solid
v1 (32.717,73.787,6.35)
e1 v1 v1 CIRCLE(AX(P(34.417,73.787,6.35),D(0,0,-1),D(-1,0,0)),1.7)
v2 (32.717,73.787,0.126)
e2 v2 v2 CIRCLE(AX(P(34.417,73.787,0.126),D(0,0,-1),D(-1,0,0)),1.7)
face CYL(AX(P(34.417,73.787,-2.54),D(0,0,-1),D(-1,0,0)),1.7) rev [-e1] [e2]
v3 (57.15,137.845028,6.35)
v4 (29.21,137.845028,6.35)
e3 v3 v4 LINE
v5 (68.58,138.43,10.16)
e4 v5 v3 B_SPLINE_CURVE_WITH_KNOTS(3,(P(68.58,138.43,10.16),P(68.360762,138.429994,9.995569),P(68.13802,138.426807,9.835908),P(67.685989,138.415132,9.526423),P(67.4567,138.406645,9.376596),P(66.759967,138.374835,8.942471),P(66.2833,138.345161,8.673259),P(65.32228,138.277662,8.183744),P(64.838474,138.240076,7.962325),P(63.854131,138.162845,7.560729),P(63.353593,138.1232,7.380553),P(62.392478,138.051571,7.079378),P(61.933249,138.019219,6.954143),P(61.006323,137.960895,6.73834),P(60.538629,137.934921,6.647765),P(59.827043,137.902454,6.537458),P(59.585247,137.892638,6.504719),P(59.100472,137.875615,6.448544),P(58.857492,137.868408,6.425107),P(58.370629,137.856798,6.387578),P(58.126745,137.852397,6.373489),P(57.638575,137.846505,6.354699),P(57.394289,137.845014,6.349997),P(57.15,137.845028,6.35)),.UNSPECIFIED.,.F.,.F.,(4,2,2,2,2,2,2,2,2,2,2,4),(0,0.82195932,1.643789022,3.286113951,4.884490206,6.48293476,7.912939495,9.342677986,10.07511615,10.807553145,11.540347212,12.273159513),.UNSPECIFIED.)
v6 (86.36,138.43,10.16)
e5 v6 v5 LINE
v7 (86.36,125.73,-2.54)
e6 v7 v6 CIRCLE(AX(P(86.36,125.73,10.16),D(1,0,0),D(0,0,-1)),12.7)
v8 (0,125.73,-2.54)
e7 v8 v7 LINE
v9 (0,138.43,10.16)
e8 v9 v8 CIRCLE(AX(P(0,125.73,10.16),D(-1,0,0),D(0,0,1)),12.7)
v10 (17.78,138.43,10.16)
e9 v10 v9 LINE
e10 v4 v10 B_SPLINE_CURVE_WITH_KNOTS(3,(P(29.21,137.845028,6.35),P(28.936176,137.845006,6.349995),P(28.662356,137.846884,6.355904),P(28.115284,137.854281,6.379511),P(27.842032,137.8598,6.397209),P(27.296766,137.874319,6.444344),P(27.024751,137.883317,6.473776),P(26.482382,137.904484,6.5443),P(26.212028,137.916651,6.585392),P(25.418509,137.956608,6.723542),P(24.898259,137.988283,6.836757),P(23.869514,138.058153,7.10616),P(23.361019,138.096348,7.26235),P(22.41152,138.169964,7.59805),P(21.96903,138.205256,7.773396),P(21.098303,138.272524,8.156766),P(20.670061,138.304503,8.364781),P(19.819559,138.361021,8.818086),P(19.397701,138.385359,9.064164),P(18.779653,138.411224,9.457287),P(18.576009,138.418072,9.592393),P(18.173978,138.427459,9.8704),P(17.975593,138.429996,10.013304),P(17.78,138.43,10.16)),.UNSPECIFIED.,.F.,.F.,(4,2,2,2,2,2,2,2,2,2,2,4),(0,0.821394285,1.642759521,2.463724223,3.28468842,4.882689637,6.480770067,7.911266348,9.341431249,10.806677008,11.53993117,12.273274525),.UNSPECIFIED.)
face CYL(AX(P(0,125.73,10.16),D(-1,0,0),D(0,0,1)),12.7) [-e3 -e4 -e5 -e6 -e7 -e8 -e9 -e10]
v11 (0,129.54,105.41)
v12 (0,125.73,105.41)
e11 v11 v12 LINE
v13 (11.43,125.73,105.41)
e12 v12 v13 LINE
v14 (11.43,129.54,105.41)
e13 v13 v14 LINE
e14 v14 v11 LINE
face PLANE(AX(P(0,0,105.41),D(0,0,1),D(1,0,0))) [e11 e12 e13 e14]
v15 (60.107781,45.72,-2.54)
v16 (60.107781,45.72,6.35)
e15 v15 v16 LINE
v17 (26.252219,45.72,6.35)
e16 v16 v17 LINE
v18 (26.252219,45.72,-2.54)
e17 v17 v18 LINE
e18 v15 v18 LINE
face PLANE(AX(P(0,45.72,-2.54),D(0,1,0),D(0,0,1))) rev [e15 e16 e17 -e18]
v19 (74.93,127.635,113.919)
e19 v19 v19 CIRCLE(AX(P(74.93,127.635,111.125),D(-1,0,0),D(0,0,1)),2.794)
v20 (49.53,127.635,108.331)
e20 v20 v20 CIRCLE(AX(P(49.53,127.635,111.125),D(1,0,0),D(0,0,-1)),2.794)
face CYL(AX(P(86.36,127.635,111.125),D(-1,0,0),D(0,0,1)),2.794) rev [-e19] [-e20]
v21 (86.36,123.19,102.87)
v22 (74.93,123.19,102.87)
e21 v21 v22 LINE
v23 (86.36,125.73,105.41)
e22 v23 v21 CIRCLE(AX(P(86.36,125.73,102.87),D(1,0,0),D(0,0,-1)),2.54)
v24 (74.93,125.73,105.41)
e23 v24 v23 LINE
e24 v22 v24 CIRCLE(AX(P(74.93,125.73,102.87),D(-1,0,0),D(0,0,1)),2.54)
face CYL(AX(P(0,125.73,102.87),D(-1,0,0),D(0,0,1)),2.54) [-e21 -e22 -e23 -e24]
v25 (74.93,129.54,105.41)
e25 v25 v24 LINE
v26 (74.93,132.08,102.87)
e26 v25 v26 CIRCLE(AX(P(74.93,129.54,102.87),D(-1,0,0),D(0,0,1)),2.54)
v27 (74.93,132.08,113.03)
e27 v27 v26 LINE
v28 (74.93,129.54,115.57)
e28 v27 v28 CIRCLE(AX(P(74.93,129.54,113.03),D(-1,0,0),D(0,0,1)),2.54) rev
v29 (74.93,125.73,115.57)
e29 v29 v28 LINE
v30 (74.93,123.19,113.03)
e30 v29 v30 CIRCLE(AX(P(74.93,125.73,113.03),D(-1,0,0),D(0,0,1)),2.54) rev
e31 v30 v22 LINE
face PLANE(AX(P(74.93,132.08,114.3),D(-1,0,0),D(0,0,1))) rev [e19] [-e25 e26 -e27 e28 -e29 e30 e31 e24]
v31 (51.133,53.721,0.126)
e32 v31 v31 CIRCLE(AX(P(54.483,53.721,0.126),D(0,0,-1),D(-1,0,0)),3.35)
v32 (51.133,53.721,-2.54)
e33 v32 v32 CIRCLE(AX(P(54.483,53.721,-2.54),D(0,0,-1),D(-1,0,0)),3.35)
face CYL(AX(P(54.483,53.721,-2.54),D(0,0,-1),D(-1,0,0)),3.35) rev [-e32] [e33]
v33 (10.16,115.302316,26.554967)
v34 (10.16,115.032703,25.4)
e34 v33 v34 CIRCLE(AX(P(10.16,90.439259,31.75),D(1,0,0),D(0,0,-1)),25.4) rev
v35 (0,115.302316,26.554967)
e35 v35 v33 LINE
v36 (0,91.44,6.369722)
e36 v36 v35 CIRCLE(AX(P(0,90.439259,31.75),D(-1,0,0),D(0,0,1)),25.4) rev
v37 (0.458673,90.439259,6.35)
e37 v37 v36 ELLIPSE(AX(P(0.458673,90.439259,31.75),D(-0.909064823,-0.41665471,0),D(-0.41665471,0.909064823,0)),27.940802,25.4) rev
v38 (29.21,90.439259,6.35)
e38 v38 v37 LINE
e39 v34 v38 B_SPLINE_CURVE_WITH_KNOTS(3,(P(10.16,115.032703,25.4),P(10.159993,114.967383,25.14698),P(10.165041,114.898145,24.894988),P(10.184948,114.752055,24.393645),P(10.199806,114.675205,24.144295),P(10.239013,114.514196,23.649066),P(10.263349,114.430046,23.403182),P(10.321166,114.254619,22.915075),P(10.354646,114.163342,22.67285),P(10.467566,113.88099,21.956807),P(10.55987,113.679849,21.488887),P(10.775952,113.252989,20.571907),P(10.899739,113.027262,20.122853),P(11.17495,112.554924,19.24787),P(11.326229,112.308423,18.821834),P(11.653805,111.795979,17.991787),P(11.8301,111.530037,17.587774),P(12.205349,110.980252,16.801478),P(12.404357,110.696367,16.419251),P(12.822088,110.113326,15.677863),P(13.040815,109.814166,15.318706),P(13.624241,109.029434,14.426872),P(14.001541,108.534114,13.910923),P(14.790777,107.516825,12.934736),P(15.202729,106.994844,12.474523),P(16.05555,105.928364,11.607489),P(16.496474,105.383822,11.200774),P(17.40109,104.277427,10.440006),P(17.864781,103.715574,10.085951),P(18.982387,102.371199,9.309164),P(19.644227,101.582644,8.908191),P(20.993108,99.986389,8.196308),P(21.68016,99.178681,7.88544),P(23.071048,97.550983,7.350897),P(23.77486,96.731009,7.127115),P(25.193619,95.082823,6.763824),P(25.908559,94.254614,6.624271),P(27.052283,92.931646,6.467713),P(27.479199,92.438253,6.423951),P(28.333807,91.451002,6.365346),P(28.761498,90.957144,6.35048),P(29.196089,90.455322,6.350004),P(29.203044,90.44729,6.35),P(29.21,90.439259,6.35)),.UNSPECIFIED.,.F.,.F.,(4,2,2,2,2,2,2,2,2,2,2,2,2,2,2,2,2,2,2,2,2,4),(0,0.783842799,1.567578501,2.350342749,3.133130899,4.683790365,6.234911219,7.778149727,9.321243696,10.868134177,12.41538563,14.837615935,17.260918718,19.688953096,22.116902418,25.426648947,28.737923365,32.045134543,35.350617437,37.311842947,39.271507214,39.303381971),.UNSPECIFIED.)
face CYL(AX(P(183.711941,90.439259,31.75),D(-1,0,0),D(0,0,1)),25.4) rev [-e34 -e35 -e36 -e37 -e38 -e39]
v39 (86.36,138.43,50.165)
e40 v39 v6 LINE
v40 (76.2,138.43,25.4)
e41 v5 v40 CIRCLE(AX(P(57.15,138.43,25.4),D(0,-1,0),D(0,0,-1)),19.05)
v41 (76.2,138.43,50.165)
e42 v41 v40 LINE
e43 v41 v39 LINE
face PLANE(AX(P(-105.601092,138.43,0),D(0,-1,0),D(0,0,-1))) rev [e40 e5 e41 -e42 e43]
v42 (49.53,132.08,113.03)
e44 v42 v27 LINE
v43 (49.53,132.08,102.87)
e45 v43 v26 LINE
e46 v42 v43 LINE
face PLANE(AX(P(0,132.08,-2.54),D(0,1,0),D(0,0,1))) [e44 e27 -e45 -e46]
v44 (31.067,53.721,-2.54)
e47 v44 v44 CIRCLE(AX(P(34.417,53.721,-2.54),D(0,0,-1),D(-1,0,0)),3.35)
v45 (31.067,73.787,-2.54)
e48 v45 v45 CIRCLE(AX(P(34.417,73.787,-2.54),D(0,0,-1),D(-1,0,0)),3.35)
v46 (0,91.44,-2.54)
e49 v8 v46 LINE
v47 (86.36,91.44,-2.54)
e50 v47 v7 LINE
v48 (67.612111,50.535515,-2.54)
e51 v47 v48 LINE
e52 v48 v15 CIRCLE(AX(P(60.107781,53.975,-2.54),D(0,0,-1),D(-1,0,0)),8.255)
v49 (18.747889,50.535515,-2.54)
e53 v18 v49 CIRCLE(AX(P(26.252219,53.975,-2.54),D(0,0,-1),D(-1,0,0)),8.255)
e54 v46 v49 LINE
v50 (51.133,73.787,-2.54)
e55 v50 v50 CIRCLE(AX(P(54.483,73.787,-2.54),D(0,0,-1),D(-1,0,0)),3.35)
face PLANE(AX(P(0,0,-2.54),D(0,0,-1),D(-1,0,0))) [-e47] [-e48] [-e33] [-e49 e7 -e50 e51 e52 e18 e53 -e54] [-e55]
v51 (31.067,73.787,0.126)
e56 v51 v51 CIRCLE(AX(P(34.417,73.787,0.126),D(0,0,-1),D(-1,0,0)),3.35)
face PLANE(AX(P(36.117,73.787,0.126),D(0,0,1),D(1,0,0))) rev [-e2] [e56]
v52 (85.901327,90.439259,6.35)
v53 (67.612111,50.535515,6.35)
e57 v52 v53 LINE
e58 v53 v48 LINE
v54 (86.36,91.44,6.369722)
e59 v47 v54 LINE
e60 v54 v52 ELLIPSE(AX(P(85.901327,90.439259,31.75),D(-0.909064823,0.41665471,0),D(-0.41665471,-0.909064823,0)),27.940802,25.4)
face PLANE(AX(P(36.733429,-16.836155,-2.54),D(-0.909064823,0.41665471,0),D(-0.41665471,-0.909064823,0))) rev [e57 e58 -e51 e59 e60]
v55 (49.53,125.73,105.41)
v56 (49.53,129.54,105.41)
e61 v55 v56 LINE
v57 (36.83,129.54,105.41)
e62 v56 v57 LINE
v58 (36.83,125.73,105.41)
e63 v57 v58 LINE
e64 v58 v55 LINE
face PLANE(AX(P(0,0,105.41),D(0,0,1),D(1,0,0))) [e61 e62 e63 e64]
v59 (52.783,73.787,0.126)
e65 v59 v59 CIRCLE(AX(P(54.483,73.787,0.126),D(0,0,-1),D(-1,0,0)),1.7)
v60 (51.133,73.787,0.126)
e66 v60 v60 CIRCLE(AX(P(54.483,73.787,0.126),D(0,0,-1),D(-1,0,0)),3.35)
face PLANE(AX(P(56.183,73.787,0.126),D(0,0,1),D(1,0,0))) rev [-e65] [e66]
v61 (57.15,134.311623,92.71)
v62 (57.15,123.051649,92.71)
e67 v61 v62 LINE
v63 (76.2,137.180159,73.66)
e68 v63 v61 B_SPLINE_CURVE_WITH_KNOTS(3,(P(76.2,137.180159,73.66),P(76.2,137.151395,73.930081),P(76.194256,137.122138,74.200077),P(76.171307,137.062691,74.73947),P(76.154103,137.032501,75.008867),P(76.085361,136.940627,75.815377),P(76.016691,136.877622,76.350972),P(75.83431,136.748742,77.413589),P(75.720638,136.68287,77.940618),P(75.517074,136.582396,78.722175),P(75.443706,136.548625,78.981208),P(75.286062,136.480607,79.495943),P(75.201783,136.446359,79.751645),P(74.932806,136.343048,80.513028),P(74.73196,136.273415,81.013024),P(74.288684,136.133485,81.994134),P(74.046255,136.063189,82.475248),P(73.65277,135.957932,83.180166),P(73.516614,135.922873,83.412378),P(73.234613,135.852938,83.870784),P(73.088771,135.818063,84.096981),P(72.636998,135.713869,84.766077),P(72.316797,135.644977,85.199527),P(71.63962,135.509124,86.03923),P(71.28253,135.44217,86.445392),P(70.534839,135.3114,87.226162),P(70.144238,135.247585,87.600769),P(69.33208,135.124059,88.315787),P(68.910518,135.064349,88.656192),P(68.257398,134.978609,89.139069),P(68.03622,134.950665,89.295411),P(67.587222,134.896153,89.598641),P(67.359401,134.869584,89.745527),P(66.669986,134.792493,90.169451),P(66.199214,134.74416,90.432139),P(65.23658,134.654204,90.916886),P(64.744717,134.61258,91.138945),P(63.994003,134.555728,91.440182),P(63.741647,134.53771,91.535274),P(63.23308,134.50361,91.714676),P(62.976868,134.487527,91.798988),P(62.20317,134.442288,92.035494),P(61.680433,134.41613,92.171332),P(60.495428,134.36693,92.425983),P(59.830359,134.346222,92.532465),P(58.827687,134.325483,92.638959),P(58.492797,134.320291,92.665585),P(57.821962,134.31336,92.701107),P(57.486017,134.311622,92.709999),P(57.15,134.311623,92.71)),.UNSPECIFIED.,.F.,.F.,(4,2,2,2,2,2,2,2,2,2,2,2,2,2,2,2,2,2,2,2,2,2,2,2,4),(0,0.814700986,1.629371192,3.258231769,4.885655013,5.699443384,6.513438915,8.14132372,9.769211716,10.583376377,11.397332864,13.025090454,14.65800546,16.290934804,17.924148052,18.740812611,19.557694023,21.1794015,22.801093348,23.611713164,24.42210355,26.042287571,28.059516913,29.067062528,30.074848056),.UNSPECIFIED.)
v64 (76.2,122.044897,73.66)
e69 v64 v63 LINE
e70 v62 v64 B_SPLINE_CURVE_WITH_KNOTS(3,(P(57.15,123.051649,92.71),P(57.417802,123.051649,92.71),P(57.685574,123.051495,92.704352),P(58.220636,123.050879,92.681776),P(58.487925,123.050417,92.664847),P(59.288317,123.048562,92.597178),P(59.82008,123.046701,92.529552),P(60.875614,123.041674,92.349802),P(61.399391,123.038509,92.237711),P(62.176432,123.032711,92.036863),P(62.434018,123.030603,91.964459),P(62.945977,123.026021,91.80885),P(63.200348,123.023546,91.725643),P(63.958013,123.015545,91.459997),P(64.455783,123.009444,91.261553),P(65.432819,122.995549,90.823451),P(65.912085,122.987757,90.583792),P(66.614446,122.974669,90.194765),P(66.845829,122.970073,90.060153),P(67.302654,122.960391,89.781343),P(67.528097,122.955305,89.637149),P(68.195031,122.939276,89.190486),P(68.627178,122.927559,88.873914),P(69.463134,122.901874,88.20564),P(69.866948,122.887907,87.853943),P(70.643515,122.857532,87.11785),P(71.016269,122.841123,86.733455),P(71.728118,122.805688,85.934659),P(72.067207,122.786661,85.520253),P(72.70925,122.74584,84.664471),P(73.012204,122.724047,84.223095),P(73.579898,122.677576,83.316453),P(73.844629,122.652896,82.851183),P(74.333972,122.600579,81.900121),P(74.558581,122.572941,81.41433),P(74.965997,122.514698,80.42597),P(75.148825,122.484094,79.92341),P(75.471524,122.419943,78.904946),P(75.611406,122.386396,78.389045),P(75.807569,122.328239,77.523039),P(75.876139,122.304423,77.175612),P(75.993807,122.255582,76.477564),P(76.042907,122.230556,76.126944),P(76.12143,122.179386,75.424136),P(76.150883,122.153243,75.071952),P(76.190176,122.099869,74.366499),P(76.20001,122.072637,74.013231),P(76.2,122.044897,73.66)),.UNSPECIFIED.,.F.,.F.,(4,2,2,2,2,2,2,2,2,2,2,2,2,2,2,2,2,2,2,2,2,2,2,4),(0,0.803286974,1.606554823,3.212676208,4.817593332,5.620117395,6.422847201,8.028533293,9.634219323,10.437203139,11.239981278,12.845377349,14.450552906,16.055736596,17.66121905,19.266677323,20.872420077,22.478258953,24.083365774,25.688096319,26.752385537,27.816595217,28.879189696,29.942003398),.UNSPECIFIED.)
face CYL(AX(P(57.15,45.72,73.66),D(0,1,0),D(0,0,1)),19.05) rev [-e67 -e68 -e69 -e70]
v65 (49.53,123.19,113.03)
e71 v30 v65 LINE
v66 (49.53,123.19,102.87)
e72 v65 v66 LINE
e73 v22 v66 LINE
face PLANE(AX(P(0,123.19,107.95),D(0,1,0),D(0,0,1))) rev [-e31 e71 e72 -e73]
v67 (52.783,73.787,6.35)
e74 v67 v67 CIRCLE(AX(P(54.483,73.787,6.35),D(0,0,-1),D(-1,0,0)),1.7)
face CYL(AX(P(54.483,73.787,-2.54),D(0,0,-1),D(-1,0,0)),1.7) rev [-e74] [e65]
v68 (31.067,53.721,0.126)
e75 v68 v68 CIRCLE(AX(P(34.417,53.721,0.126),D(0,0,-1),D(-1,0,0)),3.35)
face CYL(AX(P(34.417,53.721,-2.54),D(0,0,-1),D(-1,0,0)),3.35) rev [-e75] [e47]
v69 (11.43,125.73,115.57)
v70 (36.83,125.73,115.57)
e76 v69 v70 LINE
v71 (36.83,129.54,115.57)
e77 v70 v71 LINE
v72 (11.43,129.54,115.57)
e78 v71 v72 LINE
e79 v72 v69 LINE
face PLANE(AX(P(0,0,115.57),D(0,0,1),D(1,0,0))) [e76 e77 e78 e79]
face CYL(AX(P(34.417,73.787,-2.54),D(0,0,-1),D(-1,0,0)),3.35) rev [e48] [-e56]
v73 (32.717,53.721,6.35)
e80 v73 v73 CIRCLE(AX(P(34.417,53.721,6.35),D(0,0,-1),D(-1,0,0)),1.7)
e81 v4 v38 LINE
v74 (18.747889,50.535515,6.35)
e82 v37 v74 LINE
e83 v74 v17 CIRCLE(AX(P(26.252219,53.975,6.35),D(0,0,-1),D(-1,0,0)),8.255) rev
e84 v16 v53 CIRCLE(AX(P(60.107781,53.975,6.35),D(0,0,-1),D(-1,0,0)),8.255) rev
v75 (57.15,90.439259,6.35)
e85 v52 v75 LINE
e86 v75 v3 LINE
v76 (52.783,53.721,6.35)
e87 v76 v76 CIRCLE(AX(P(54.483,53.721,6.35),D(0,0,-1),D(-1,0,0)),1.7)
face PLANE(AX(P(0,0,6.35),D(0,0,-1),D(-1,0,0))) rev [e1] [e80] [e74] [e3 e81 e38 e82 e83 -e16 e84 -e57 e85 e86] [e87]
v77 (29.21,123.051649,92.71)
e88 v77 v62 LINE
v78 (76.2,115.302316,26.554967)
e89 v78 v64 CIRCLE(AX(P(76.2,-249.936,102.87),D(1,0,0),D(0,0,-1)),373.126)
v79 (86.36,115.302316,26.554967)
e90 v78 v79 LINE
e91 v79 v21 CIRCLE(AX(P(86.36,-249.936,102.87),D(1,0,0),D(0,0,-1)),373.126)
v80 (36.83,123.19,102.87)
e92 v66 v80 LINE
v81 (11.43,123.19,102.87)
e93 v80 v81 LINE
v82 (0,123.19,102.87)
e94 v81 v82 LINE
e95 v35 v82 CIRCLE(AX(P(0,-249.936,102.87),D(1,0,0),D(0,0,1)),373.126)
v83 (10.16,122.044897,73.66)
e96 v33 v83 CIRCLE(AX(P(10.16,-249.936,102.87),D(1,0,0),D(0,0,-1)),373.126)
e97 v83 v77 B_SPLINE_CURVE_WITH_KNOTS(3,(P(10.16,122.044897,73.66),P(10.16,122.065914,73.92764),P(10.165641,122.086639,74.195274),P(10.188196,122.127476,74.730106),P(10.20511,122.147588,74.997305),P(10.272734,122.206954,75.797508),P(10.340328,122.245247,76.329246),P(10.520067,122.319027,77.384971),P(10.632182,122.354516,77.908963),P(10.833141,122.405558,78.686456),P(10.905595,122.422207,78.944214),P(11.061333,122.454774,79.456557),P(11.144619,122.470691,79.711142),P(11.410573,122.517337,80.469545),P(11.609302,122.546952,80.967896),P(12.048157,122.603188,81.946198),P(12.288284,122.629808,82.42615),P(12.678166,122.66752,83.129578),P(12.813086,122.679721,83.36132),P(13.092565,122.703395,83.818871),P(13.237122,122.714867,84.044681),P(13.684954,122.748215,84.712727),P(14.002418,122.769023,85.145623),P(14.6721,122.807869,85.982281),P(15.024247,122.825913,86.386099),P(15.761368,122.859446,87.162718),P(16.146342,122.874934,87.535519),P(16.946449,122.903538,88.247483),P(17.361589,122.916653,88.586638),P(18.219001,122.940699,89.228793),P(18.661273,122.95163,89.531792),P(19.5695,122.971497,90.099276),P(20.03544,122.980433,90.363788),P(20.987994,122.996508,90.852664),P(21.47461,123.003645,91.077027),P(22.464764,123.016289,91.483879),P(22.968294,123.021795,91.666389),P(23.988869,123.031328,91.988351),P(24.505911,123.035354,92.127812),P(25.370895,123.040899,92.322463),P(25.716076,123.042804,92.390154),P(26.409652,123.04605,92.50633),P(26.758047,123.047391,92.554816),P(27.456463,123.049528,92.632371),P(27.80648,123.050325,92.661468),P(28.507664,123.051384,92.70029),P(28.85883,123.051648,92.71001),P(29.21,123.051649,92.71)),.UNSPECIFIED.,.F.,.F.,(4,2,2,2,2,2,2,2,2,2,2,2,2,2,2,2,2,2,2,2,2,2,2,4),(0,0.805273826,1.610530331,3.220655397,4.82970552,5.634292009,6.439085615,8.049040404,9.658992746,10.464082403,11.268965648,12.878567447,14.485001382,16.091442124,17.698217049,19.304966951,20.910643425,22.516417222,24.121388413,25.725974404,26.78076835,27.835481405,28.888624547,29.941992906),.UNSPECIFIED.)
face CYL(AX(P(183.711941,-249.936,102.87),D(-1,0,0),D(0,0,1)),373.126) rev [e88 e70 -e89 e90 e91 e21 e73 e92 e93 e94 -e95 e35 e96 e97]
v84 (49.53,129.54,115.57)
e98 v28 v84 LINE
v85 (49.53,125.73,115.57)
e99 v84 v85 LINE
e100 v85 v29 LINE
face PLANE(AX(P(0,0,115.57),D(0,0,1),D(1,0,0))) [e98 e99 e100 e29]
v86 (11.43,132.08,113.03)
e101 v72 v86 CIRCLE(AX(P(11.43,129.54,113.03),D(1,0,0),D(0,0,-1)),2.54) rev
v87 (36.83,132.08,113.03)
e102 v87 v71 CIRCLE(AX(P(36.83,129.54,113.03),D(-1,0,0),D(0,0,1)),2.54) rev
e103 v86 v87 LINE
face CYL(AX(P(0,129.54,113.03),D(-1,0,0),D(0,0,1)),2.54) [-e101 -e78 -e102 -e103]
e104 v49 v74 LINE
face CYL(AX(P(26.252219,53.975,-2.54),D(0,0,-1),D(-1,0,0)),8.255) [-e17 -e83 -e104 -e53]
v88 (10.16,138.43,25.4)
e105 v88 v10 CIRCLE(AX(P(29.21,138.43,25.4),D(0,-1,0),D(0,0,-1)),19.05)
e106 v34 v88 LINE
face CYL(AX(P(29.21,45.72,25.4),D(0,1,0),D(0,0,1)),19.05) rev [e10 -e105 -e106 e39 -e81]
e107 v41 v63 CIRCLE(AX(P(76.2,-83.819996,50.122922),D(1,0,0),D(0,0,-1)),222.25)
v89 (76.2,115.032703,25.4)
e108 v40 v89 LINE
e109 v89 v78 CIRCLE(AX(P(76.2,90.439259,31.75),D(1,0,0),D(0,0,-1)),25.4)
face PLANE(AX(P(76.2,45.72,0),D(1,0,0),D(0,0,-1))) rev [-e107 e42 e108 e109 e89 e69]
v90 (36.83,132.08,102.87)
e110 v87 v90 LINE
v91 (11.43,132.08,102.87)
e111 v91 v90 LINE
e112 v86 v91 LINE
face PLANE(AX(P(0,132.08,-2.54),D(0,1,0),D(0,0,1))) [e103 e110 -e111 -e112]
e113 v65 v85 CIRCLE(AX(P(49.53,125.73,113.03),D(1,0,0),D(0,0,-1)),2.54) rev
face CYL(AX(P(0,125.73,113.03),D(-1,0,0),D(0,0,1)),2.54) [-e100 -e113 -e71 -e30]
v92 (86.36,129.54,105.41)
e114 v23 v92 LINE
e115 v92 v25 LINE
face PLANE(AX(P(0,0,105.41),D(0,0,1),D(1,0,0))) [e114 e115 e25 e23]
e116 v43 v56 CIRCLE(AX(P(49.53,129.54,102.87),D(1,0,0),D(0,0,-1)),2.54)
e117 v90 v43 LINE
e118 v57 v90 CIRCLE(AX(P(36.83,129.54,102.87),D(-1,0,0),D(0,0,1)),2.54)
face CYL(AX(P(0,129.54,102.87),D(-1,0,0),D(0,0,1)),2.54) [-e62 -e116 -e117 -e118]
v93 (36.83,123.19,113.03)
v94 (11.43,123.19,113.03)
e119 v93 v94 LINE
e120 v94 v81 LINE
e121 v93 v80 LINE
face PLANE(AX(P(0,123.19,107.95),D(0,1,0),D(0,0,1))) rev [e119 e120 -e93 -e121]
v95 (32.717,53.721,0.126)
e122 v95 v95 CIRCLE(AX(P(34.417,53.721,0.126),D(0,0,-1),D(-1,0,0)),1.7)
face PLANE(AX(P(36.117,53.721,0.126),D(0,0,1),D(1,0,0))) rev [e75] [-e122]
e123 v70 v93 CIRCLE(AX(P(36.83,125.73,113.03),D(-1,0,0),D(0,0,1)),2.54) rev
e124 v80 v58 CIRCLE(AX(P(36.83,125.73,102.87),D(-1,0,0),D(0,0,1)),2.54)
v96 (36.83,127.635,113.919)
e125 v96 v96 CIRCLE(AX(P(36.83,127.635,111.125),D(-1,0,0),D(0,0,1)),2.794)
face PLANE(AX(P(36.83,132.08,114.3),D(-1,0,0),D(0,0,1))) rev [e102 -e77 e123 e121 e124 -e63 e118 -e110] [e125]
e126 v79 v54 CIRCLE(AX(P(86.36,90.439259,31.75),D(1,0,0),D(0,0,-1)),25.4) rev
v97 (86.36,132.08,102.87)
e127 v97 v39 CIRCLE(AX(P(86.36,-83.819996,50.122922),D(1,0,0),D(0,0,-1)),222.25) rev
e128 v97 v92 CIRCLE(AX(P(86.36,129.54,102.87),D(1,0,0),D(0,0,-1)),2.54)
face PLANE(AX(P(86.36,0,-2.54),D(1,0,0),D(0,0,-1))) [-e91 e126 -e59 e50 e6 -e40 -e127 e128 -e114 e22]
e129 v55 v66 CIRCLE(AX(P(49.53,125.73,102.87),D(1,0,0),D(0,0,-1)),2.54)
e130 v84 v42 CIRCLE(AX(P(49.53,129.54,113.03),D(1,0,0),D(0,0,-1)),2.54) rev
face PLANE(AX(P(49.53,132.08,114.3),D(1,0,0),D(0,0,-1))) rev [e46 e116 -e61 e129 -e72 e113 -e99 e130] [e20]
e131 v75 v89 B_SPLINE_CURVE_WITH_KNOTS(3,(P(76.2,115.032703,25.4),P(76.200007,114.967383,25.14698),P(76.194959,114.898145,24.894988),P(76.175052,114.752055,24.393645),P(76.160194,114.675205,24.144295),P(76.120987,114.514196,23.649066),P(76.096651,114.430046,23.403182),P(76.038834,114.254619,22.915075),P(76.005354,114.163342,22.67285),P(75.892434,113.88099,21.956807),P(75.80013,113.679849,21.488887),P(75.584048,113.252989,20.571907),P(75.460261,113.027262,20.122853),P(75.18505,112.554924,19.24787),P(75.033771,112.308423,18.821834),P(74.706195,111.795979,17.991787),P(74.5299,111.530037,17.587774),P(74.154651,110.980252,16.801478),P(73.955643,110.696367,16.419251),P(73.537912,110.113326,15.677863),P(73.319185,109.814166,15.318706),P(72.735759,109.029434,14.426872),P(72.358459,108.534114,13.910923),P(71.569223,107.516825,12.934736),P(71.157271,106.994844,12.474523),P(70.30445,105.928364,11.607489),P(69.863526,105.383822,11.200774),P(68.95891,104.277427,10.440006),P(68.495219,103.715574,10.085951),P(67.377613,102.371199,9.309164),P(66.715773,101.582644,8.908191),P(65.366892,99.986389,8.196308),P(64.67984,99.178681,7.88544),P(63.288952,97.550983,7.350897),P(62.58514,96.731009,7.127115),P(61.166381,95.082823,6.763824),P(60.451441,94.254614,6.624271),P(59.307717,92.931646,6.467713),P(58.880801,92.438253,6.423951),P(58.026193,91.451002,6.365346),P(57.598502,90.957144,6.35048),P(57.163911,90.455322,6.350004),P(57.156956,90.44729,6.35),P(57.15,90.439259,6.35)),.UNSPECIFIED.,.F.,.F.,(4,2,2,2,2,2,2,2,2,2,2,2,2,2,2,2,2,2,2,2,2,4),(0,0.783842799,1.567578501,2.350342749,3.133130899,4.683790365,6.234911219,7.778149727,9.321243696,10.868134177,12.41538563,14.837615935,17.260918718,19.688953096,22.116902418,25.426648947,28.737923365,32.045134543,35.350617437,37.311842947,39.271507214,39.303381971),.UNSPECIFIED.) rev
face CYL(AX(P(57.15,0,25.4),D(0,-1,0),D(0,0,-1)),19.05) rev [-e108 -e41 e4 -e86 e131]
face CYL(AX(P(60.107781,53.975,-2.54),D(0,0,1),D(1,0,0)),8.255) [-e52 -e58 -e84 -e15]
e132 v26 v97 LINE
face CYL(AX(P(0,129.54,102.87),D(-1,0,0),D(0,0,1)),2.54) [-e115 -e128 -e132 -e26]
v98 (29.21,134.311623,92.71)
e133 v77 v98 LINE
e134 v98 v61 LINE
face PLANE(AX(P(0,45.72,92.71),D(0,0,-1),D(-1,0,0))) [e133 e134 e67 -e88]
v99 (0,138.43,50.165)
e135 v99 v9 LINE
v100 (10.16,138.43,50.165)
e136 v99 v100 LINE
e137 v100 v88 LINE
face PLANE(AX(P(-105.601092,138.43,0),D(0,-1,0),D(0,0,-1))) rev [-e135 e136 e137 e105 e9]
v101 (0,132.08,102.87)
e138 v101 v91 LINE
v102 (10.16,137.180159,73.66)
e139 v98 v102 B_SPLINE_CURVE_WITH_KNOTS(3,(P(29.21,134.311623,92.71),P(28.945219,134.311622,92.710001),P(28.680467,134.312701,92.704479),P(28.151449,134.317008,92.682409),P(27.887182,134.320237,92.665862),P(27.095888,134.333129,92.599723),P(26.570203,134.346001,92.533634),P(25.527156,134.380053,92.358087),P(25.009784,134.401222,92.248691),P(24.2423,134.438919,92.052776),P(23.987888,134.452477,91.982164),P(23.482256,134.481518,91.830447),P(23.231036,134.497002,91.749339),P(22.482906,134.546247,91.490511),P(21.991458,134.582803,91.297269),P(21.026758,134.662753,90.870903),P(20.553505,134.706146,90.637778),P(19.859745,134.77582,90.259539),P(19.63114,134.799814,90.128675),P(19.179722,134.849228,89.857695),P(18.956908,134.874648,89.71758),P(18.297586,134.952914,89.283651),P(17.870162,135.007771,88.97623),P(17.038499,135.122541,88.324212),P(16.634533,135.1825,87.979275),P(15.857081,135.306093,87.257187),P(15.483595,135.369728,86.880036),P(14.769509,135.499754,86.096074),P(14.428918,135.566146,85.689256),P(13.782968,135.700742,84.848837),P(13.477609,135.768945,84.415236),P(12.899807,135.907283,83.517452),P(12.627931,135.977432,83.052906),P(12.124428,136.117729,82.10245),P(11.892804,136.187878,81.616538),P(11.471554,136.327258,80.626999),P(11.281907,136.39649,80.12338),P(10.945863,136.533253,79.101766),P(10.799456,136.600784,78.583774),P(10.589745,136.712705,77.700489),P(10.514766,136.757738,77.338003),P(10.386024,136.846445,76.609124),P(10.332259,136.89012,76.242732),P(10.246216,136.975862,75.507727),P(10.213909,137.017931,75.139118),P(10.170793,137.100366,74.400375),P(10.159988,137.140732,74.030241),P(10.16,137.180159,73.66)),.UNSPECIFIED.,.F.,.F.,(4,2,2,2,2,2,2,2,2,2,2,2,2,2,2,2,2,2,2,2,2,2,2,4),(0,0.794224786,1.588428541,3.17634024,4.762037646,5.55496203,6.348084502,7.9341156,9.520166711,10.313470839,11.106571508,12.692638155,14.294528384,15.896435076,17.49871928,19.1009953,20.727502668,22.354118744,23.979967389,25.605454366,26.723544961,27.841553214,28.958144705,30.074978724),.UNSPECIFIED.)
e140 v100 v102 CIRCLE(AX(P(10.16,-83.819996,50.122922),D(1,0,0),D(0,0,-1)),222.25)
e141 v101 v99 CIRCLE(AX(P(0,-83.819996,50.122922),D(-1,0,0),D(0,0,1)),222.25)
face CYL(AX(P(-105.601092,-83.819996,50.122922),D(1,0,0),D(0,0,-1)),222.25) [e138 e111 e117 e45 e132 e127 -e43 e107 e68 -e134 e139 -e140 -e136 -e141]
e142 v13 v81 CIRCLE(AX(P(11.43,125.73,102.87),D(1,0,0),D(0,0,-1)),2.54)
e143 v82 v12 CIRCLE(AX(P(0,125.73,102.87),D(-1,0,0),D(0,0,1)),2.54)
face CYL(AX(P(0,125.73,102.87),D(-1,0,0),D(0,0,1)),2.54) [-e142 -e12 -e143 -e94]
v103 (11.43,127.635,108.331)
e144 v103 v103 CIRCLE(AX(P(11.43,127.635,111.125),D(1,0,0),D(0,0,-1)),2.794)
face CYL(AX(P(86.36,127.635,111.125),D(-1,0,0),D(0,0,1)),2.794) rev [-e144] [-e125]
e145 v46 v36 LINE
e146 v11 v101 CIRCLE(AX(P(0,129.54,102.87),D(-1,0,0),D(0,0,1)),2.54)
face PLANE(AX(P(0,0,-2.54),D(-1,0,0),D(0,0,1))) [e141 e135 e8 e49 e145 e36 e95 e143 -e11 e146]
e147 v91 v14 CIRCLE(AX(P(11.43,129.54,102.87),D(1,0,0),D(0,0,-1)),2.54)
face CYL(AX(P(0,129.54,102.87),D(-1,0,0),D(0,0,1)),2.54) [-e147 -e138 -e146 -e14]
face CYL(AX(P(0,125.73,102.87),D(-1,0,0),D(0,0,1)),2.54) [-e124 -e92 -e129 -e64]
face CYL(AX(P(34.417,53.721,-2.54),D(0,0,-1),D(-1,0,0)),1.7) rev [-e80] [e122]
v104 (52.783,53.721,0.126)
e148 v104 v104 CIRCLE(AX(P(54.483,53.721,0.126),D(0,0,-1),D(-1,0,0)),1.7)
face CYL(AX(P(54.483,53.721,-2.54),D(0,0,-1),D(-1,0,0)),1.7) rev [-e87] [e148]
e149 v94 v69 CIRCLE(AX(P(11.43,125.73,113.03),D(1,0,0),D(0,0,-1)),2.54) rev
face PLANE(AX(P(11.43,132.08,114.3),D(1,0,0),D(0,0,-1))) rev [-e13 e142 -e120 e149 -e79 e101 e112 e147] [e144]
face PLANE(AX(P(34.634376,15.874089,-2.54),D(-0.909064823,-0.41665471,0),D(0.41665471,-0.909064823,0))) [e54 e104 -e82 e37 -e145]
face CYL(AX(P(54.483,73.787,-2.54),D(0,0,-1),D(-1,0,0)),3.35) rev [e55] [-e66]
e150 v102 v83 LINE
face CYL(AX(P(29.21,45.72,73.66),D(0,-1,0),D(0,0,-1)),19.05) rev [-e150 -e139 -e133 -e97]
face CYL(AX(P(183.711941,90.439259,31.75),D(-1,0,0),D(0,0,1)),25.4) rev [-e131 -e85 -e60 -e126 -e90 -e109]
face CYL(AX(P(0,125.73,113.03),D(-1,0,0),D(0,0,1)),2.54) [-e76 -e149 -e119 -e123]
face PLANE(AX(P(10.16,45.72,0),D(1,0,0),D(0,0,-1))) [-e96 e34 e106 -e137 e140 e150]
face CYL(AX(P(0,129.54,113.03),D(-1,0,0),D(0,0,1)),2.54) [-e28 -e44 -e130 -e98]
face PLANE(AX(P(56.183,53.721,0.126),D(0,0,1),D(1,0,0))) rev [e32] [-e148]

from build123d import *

# Parameters (mm, degrees)
BOSS_EXTRUDE2_DEPTH             = 6.35
BOSS_EXTRUDE2_DEPTH_BACK        = 2.54
SKETCH2_W                       = 86.35999999999999
SKETCH2_H                       = 132.07999999999998
SKETCH3_W                       = 86.35999999999999
SKETCH3_H                       = 8.889999999999999
BOSS_EXTRUDE3_DEPTH             = 101.6
SKETCH6_W                       = 25.39999999999999
SKETCH6_H                       = 8.89
BOSS_EXTRUDE4_DEPTH             = 6.35
CBORE_FOR_M3_SBHCS1_D           = 3.4
CBORE_FOR_M3_SBHCS1_CBORE_D     = 6.7
CBORE_FOR_M3_SBHCS1_CBORE_DEPTH = 2.666
CUT_EXTRUDE3_DEPTH              = 182.55670546691465
CUT_EXTRUDE3_DEPTH_BACK         = 182.55670546691465
SKETCH7_R                       = 2.7940000000000107
FILLET1_R                       = 2.5399999999999996
SKETCH11_W                      = 86.35999999999999
SKETCH11_H                      = 8.889999999999999
CUT_EXTRUDE4_DEPTH              = 22.86
SKETCH12_W                      = 11.429999999999993
SKETCH12_H                      = 8.89
SKETCH12_W_2                    = 11.429999999999998
CUT_EXTRUDE5_DEPTH              = 2.5399999999999996
MOVE_START                      = 11.43
MOVE_FACE1_DEPTH                = 25.4
MOVE_START_2                    = 49.53
MOVE_FACE1_2_DEPTH              = 25.4
SKETCH13_W                      = 86.35999999999999
SKETCH13_H                      = 78.74000000000001
CUT_EXTRUDE6_DEPTH              = 190.71096594556678
CUT_EXTRUDE7_DEPTH              = 192.9171289906141
FILLET8_R                       = 2.54
BOSS_EXTRUDE6_START             = -86.36
BOSS_EXTRUDE6_DEPTH             = 86.36
BOSS_EXTRUDE8_START             = -86.36
BOSS_EXTRUDE8_DEPTH             = 86.36
CUT_EXTRUDE8_DEPTH              = 169.1443549453861
CUT_EXTRUDE8_DEPTH_BACK         = 169.1443549453861
FILLET12_R                      = 19.05
FILLET13_R                      = 25.4
FILLET14_R                      = 8.255
FILLET16_R                      = 12.7


# Read off the part's stored shape, not the designer's step: Move Face1
with BuildPart() as part:
    # Sketch2 → Boss-Extrude2 (new, two sides: drawn at the far end of the back side and taken through both)
    with BuildSketch(Plane.XY.offset(-BOSS_EXTRUDE2_DEPTH_BACK)):
        with Locations((43.17999999999999, 66.03999999999999)):
            Rectangle(SKETCH2_W, SKETCH2_H)
    extrude(amount=BOSS_EXTRUDE2_DEPTH + BOSS_EXTRUDE2_DEPTH_BACK)

    # Sketch3 → Boss-Extrude3 (add)
    with BuildSketch(Plane.XY.offset(6.35)):
        Polygon((0, 132.07999999999998), (86.35999999999999, 132.07999999999998), (86.35999999999999, 123.18999999999998), (-3.27e-15, 123.18999999999998), align=None)
        with Locations((43.17999999999999, 4.444999999999999)):
            Rectangle(SKETCH3_W, SKETCH3_H)
    extrude(amount=BOSS_EXTRUDE3_DEPTH)

    # Sketch6 → Boss-Extrude4 (add)
    with BuildSketch(Plane.XY.offset(107.94999999999999)):
        with Locations((62.23, 127.63499999999999)):
            Rectangle(SKETCH6_W, SKETCH6_H)
        with Locations((24.129999999999995, 127.63499999999999)):
            Rectangle(SKETCH6_W, SKETCH6_H)
    extrude(amount=BOSS_EXTRUDE4_DEPTH)

    # CBORE for M3 SBHCS1 (through all)
    with Locations(Plane(origin=(0, 0, -2.54), x_dir=(1, 0, 0), z_dir=(0, 0, -1))):
        with Locations((34.417, -53.721), (54.483, -53.721), (34.417, -73.787), (54.483, -73.787)):
            CounterBoreHole(CBORE_FOR_M3_SBHCS1_D / 2, CBORE_FOR_M3_SBHCS1_CBORE_D / 2, CBORE_FOR_M3_SBHCS1_CBORE_DEPTH)

    # Sketch7 → Cut-Extrude3 (cut, two sides: drawn at the far end of the back side and taken through both)
    with BuildSketch(Plane.ZY.offset(-49.53).offset(-CUT_EXTRUDE3_DEPTH_BACK)):
        with Locations((111.12499999999999, 127.635)):
            Circle(SKETCH7_R)
    extrude(amount=CUT_EXTRUDE3_DEPTH + CUT_EXTRUDE3_DEPTH_BACK, mode=Mode.SUBTRACT)

    # Fillet1
    fillet1_edges = [part.edges().sort_by_distance(p)[0] for p in [
        (62.23, 123.18999999999998, 114.29999999999998),
        (62.23, 132.07999999999998, 114.29999999999998),
        (24.129999999999995, 123.18999999999998, 114.29999999999998),
        (24.129999999999995, 132.07999999999998, 114.29999999999998),
    ]]
    fillet(fillet1_edges, radius=FILLET1_R)

    # Sketch11 → Cut-Extrude4 (cut)
    with BuildSketch(Plane.XY.offset(107.94999999999999)):
        with Locations((43.17999999999999, 4.444999999999999)):
            Rectangle(SKETCH11_W, SKETCH11_H)
    extrude(amount=-CUT_EXTRUDE4_DEPTH, mode=Mode.SUBTRACT)

    # Sketch12 → Cut-Extrude5 (cut)
    with BuildSketch(Plane.XY.offset(107.94999999999999)):
        with Locations((80.64499999999998, 127.63499999999999)):
            Rectangle(SKETCH12_W, SKETCH12_H)
        Polygon((49.53, 123.18999999999998), (36.82999999999999, 123.18999999999997), (36.82999999999999, 132.07999999999998), (49.53, 132.07999999999998), align=None)
        with Locations((5.714999999999999, 127.63499999999999)):
            Rectangle(SKETCH12_W_2, SKETCH12_H)
    extrude(amount=-CUT_EXTRUDE5_DEPTH, mode=Mode.SUBTRACT)

    # Move Face1 outline → Move Face1 (add)
    with BuildSketch(Plane.YZ.offset(MOVE_START)):
        with BuildLine():
            ThreePointArc((132.08, 113.03), (131.336051224, 114.826051224), (129.54, 115.57))
            Line((129.54, 115.57), (125.73, 115.57))
            ThreePointArc((125.73, 115.57), (123.933948776, 114.826051224), (123.19, 113.03))
            Line((123.19, 113.03), (123.19, 111.76))
            ThreePointArc((123.19, 111.76), (123.933948776, 113.556051224), (125.73, 114.3))
            Line((125.73, 114.3), (129.54, 114.3))
            ThreePointArc((129.54, 114.3), (131.336051224, 113.556051224), (132.08, 111.76))
            Line((132.08, 111.76), (132.08, 113.03))
        make_face()
    extrude(amount=MOVE_FACE1_DEPTH)

    # Move Face1 2 outline → Move Face1 2 (add)
    with BuildSketch(Plane.YZ.offset(MOVE_START_2)):
        with BuildLine():
            ThreePointArc((132.08, 113.03), (131.336051224, 114.826051224), (129.54, 115.57))
            Line((129.54, 115.57), (125.73, 115.57))
            ThreePointArc((125.73, 115.57), (123.933948776, 114.826051224), (123.19, 113.03))
            Line((123.19, 113.03), (123.19, 111.76))
            ThreePointArc((123.19, 111.76), (123.933948776, 113.556051224), (125.73, 114.3))
            Line((125.73, 114.3), (129.54, 114.3))
            ThreePointArc((129.54, 114.3), (131.336051224, 113.556051224), (132.08, 111.76))
            Line((132.08, 111.76), (132.08, 113.03))
        make_face()
    extrude(amount=MOVE_FACE1_2_DEPTH)

    # Sketch13 → Cut-Extrude6 (cut, through all)
    with BuildSketch(Plane(origin=(0, 8.889999999999999, 0), x_dir=(1, 0, 0), z_dir=(0, 1, 0))):
        with Locations((43.17999999999999, -45.72)):
            Rectangle(SKETCH13_W, SKETCH13_H)
    extrude(amount=-CUT_EXTRUDE6_DEPTH, mode=Mode.SUBTRACT)

    # Sketch14 → Cut-Extrude7 (cut, through all)
    with BuildSketch(Plane.XY.offset(6.35)):
        Polygon((86.35999999999999, 91.43999999999998), (65.40499999999999, 45.71999999999999), (20.955, 45.71999999999999), (3.89e-15, 91.43999999999998), (0, 0), (86.35999999999999, 0), align=None)
    extrude(amount=-CUT_EXTRUDE7_DEPTH, mode=Mode.SUBTRACT)

    # Fillet8
    fillet8_edges = [part.edges().sort_by_distance(p)[0] for p in [
        (80.64499999999998, 123.18999999999998, 105.40999999999998),
        (80.64499999999998, 132.07999999999998, 105.40999999999998),
        (43.17999999999999, 123.18999999999997, 105.40999999999998),
        (43.17999999999999, 132.07999999999998, 105.40999999999998),
        (5.714999999999999, 123.18999999999998, 105.40999999999998),
        (5.714999999999999, 132.07999999999998, 105.40999999999998),
    ]]
    fillet(fillet8_edges, radius=FILLET8_R)

    # Sketch17 → Boss-Extrude6 (add)
    with BuildSketch(Plane(origin=(86.35999999999999, 0, 0), x_dir=(0, 0, -1), z_dir=(1, 0, 0)).offset(BOSS_EXTRUDE6_START)):
        with BuildLine():
            Line((-102.86999999999999, 132.07999999999998), (2.5400000000000063, 132.07999999999998))
            Line((2.54, 132.07999999999998), (2.5400000000000005, 138.42999999999998))
            Line((2.539999999999999, 138.42999999999998), (-50.165, 138.42999999999998))
            ThreePointArc((-50.16499999999999, 138.43), (-76.70777431972341, 136.8342768537044), (-102.86999999999999, 132.07999999999998))
        make_face()
    extrude(amount=BOSS_EXTRUDE6_DEPTH)

    # Sketch20 → Boss-Extrude8 (add)
    with BuildSketch(Plane.ZY.offset(BOSS_EXTRUDE8_START)):
        with BuildLine():
            Line((6.35, 110.48999999999998), (6.35, 123.18999999999998))
            Line((6.35, 123.18999999999998), (102.86999999999999, 123.18999999999998))
            ThreePointArc((102.86999999999999, 123.18999999999998), (54.19402954228848, 120.00137547860714), (6.35, 110.48999999999998))
        make_face()
    extrude(amount=BOSS_EXTRUDE8_DEPTH)

    # Sketch16 → Cut-Extrude8 (cut, two sides: drawn at the far end of the back side and taken through both)
    with BuildSketch(Plane(origin=(0, 132.07999999999998, 0), x_dir=(1, 0, 0), z_dir=(0, 1, 0)).offset(-CUT_EXTRUDE8_DEPTH_BACK)):
        Polygon((10.160000000000016, -92.71), (10.160000000000016, -6.350000000000009), (76.19999999999999, -6.350000000000002), (76.19999999999999, -92.71), align=None)
    extrude(amount=CUT_EXTRUDE8_DEPTH + CUT_EXTRUDE8_DEPTH_BACK, mode=Mode.SUBTRACT)

    # Fillet12
    fillet12_edges = [part.edges().sort_by_distance(p)[0] for p in [
        (10.160000000000016, 128.681636078935, 92.71),
        (76.19999999999999, 124.45999999999998, 6.350000000000002),
        (76.19999999999999, 128.681636078935, 92.71),
        (10.160000000000016, 124.45999999999998, 6.350000000000009),
    ]]
    fillet(fillet12_edges, radius=FILLET12_R)

    # Fillet13
    fillet13_edges = [part.edges().sort_by_distance(p)[0] for p in [
        (71.755, 110.49000000000001, 6.349999999999991),
        (14.605000000000006, 110.49000000000001, 6.349999999999989),
    ]]
    fillet(fillet13_edges, radius=FILLET13_R)

    # Fillet14
    fillet14_edges = [part.edges().sort_by_distance(p)[0] for p in [
        (20.955, 45.71999999999999, 1.9049999999999994),
        (65.40499999999999, 45.71999999999999, 1.9049999999999994),
    ]]
    fillet(fillet14_edges, radius=FILLET14_R)

    # Fillet16
    # the kernel refuses this fillet: 12.7 mm, written as the material it takes off along each edge
    with BuildSketch(Plane(origin=(-31.750000000000018, 138.42999999999998, -2.5400000000000005), x_dir=(0, 0, 1), z_dir=(1, 0, 0))) as fillet16_piece_1:
        with BuildLine():
            CenterArc((FILLET16_R, FILLET16_R), FILLET16_R, 180, 90)
            Line((3.11e-15, FILLET16_R), (0, 0))
            Line((0, 0), (FILLET16_R, 0))
        make_face()
    extrude(amount=149.86, mode=Mode.SUBTRACT)


solid = part.part
